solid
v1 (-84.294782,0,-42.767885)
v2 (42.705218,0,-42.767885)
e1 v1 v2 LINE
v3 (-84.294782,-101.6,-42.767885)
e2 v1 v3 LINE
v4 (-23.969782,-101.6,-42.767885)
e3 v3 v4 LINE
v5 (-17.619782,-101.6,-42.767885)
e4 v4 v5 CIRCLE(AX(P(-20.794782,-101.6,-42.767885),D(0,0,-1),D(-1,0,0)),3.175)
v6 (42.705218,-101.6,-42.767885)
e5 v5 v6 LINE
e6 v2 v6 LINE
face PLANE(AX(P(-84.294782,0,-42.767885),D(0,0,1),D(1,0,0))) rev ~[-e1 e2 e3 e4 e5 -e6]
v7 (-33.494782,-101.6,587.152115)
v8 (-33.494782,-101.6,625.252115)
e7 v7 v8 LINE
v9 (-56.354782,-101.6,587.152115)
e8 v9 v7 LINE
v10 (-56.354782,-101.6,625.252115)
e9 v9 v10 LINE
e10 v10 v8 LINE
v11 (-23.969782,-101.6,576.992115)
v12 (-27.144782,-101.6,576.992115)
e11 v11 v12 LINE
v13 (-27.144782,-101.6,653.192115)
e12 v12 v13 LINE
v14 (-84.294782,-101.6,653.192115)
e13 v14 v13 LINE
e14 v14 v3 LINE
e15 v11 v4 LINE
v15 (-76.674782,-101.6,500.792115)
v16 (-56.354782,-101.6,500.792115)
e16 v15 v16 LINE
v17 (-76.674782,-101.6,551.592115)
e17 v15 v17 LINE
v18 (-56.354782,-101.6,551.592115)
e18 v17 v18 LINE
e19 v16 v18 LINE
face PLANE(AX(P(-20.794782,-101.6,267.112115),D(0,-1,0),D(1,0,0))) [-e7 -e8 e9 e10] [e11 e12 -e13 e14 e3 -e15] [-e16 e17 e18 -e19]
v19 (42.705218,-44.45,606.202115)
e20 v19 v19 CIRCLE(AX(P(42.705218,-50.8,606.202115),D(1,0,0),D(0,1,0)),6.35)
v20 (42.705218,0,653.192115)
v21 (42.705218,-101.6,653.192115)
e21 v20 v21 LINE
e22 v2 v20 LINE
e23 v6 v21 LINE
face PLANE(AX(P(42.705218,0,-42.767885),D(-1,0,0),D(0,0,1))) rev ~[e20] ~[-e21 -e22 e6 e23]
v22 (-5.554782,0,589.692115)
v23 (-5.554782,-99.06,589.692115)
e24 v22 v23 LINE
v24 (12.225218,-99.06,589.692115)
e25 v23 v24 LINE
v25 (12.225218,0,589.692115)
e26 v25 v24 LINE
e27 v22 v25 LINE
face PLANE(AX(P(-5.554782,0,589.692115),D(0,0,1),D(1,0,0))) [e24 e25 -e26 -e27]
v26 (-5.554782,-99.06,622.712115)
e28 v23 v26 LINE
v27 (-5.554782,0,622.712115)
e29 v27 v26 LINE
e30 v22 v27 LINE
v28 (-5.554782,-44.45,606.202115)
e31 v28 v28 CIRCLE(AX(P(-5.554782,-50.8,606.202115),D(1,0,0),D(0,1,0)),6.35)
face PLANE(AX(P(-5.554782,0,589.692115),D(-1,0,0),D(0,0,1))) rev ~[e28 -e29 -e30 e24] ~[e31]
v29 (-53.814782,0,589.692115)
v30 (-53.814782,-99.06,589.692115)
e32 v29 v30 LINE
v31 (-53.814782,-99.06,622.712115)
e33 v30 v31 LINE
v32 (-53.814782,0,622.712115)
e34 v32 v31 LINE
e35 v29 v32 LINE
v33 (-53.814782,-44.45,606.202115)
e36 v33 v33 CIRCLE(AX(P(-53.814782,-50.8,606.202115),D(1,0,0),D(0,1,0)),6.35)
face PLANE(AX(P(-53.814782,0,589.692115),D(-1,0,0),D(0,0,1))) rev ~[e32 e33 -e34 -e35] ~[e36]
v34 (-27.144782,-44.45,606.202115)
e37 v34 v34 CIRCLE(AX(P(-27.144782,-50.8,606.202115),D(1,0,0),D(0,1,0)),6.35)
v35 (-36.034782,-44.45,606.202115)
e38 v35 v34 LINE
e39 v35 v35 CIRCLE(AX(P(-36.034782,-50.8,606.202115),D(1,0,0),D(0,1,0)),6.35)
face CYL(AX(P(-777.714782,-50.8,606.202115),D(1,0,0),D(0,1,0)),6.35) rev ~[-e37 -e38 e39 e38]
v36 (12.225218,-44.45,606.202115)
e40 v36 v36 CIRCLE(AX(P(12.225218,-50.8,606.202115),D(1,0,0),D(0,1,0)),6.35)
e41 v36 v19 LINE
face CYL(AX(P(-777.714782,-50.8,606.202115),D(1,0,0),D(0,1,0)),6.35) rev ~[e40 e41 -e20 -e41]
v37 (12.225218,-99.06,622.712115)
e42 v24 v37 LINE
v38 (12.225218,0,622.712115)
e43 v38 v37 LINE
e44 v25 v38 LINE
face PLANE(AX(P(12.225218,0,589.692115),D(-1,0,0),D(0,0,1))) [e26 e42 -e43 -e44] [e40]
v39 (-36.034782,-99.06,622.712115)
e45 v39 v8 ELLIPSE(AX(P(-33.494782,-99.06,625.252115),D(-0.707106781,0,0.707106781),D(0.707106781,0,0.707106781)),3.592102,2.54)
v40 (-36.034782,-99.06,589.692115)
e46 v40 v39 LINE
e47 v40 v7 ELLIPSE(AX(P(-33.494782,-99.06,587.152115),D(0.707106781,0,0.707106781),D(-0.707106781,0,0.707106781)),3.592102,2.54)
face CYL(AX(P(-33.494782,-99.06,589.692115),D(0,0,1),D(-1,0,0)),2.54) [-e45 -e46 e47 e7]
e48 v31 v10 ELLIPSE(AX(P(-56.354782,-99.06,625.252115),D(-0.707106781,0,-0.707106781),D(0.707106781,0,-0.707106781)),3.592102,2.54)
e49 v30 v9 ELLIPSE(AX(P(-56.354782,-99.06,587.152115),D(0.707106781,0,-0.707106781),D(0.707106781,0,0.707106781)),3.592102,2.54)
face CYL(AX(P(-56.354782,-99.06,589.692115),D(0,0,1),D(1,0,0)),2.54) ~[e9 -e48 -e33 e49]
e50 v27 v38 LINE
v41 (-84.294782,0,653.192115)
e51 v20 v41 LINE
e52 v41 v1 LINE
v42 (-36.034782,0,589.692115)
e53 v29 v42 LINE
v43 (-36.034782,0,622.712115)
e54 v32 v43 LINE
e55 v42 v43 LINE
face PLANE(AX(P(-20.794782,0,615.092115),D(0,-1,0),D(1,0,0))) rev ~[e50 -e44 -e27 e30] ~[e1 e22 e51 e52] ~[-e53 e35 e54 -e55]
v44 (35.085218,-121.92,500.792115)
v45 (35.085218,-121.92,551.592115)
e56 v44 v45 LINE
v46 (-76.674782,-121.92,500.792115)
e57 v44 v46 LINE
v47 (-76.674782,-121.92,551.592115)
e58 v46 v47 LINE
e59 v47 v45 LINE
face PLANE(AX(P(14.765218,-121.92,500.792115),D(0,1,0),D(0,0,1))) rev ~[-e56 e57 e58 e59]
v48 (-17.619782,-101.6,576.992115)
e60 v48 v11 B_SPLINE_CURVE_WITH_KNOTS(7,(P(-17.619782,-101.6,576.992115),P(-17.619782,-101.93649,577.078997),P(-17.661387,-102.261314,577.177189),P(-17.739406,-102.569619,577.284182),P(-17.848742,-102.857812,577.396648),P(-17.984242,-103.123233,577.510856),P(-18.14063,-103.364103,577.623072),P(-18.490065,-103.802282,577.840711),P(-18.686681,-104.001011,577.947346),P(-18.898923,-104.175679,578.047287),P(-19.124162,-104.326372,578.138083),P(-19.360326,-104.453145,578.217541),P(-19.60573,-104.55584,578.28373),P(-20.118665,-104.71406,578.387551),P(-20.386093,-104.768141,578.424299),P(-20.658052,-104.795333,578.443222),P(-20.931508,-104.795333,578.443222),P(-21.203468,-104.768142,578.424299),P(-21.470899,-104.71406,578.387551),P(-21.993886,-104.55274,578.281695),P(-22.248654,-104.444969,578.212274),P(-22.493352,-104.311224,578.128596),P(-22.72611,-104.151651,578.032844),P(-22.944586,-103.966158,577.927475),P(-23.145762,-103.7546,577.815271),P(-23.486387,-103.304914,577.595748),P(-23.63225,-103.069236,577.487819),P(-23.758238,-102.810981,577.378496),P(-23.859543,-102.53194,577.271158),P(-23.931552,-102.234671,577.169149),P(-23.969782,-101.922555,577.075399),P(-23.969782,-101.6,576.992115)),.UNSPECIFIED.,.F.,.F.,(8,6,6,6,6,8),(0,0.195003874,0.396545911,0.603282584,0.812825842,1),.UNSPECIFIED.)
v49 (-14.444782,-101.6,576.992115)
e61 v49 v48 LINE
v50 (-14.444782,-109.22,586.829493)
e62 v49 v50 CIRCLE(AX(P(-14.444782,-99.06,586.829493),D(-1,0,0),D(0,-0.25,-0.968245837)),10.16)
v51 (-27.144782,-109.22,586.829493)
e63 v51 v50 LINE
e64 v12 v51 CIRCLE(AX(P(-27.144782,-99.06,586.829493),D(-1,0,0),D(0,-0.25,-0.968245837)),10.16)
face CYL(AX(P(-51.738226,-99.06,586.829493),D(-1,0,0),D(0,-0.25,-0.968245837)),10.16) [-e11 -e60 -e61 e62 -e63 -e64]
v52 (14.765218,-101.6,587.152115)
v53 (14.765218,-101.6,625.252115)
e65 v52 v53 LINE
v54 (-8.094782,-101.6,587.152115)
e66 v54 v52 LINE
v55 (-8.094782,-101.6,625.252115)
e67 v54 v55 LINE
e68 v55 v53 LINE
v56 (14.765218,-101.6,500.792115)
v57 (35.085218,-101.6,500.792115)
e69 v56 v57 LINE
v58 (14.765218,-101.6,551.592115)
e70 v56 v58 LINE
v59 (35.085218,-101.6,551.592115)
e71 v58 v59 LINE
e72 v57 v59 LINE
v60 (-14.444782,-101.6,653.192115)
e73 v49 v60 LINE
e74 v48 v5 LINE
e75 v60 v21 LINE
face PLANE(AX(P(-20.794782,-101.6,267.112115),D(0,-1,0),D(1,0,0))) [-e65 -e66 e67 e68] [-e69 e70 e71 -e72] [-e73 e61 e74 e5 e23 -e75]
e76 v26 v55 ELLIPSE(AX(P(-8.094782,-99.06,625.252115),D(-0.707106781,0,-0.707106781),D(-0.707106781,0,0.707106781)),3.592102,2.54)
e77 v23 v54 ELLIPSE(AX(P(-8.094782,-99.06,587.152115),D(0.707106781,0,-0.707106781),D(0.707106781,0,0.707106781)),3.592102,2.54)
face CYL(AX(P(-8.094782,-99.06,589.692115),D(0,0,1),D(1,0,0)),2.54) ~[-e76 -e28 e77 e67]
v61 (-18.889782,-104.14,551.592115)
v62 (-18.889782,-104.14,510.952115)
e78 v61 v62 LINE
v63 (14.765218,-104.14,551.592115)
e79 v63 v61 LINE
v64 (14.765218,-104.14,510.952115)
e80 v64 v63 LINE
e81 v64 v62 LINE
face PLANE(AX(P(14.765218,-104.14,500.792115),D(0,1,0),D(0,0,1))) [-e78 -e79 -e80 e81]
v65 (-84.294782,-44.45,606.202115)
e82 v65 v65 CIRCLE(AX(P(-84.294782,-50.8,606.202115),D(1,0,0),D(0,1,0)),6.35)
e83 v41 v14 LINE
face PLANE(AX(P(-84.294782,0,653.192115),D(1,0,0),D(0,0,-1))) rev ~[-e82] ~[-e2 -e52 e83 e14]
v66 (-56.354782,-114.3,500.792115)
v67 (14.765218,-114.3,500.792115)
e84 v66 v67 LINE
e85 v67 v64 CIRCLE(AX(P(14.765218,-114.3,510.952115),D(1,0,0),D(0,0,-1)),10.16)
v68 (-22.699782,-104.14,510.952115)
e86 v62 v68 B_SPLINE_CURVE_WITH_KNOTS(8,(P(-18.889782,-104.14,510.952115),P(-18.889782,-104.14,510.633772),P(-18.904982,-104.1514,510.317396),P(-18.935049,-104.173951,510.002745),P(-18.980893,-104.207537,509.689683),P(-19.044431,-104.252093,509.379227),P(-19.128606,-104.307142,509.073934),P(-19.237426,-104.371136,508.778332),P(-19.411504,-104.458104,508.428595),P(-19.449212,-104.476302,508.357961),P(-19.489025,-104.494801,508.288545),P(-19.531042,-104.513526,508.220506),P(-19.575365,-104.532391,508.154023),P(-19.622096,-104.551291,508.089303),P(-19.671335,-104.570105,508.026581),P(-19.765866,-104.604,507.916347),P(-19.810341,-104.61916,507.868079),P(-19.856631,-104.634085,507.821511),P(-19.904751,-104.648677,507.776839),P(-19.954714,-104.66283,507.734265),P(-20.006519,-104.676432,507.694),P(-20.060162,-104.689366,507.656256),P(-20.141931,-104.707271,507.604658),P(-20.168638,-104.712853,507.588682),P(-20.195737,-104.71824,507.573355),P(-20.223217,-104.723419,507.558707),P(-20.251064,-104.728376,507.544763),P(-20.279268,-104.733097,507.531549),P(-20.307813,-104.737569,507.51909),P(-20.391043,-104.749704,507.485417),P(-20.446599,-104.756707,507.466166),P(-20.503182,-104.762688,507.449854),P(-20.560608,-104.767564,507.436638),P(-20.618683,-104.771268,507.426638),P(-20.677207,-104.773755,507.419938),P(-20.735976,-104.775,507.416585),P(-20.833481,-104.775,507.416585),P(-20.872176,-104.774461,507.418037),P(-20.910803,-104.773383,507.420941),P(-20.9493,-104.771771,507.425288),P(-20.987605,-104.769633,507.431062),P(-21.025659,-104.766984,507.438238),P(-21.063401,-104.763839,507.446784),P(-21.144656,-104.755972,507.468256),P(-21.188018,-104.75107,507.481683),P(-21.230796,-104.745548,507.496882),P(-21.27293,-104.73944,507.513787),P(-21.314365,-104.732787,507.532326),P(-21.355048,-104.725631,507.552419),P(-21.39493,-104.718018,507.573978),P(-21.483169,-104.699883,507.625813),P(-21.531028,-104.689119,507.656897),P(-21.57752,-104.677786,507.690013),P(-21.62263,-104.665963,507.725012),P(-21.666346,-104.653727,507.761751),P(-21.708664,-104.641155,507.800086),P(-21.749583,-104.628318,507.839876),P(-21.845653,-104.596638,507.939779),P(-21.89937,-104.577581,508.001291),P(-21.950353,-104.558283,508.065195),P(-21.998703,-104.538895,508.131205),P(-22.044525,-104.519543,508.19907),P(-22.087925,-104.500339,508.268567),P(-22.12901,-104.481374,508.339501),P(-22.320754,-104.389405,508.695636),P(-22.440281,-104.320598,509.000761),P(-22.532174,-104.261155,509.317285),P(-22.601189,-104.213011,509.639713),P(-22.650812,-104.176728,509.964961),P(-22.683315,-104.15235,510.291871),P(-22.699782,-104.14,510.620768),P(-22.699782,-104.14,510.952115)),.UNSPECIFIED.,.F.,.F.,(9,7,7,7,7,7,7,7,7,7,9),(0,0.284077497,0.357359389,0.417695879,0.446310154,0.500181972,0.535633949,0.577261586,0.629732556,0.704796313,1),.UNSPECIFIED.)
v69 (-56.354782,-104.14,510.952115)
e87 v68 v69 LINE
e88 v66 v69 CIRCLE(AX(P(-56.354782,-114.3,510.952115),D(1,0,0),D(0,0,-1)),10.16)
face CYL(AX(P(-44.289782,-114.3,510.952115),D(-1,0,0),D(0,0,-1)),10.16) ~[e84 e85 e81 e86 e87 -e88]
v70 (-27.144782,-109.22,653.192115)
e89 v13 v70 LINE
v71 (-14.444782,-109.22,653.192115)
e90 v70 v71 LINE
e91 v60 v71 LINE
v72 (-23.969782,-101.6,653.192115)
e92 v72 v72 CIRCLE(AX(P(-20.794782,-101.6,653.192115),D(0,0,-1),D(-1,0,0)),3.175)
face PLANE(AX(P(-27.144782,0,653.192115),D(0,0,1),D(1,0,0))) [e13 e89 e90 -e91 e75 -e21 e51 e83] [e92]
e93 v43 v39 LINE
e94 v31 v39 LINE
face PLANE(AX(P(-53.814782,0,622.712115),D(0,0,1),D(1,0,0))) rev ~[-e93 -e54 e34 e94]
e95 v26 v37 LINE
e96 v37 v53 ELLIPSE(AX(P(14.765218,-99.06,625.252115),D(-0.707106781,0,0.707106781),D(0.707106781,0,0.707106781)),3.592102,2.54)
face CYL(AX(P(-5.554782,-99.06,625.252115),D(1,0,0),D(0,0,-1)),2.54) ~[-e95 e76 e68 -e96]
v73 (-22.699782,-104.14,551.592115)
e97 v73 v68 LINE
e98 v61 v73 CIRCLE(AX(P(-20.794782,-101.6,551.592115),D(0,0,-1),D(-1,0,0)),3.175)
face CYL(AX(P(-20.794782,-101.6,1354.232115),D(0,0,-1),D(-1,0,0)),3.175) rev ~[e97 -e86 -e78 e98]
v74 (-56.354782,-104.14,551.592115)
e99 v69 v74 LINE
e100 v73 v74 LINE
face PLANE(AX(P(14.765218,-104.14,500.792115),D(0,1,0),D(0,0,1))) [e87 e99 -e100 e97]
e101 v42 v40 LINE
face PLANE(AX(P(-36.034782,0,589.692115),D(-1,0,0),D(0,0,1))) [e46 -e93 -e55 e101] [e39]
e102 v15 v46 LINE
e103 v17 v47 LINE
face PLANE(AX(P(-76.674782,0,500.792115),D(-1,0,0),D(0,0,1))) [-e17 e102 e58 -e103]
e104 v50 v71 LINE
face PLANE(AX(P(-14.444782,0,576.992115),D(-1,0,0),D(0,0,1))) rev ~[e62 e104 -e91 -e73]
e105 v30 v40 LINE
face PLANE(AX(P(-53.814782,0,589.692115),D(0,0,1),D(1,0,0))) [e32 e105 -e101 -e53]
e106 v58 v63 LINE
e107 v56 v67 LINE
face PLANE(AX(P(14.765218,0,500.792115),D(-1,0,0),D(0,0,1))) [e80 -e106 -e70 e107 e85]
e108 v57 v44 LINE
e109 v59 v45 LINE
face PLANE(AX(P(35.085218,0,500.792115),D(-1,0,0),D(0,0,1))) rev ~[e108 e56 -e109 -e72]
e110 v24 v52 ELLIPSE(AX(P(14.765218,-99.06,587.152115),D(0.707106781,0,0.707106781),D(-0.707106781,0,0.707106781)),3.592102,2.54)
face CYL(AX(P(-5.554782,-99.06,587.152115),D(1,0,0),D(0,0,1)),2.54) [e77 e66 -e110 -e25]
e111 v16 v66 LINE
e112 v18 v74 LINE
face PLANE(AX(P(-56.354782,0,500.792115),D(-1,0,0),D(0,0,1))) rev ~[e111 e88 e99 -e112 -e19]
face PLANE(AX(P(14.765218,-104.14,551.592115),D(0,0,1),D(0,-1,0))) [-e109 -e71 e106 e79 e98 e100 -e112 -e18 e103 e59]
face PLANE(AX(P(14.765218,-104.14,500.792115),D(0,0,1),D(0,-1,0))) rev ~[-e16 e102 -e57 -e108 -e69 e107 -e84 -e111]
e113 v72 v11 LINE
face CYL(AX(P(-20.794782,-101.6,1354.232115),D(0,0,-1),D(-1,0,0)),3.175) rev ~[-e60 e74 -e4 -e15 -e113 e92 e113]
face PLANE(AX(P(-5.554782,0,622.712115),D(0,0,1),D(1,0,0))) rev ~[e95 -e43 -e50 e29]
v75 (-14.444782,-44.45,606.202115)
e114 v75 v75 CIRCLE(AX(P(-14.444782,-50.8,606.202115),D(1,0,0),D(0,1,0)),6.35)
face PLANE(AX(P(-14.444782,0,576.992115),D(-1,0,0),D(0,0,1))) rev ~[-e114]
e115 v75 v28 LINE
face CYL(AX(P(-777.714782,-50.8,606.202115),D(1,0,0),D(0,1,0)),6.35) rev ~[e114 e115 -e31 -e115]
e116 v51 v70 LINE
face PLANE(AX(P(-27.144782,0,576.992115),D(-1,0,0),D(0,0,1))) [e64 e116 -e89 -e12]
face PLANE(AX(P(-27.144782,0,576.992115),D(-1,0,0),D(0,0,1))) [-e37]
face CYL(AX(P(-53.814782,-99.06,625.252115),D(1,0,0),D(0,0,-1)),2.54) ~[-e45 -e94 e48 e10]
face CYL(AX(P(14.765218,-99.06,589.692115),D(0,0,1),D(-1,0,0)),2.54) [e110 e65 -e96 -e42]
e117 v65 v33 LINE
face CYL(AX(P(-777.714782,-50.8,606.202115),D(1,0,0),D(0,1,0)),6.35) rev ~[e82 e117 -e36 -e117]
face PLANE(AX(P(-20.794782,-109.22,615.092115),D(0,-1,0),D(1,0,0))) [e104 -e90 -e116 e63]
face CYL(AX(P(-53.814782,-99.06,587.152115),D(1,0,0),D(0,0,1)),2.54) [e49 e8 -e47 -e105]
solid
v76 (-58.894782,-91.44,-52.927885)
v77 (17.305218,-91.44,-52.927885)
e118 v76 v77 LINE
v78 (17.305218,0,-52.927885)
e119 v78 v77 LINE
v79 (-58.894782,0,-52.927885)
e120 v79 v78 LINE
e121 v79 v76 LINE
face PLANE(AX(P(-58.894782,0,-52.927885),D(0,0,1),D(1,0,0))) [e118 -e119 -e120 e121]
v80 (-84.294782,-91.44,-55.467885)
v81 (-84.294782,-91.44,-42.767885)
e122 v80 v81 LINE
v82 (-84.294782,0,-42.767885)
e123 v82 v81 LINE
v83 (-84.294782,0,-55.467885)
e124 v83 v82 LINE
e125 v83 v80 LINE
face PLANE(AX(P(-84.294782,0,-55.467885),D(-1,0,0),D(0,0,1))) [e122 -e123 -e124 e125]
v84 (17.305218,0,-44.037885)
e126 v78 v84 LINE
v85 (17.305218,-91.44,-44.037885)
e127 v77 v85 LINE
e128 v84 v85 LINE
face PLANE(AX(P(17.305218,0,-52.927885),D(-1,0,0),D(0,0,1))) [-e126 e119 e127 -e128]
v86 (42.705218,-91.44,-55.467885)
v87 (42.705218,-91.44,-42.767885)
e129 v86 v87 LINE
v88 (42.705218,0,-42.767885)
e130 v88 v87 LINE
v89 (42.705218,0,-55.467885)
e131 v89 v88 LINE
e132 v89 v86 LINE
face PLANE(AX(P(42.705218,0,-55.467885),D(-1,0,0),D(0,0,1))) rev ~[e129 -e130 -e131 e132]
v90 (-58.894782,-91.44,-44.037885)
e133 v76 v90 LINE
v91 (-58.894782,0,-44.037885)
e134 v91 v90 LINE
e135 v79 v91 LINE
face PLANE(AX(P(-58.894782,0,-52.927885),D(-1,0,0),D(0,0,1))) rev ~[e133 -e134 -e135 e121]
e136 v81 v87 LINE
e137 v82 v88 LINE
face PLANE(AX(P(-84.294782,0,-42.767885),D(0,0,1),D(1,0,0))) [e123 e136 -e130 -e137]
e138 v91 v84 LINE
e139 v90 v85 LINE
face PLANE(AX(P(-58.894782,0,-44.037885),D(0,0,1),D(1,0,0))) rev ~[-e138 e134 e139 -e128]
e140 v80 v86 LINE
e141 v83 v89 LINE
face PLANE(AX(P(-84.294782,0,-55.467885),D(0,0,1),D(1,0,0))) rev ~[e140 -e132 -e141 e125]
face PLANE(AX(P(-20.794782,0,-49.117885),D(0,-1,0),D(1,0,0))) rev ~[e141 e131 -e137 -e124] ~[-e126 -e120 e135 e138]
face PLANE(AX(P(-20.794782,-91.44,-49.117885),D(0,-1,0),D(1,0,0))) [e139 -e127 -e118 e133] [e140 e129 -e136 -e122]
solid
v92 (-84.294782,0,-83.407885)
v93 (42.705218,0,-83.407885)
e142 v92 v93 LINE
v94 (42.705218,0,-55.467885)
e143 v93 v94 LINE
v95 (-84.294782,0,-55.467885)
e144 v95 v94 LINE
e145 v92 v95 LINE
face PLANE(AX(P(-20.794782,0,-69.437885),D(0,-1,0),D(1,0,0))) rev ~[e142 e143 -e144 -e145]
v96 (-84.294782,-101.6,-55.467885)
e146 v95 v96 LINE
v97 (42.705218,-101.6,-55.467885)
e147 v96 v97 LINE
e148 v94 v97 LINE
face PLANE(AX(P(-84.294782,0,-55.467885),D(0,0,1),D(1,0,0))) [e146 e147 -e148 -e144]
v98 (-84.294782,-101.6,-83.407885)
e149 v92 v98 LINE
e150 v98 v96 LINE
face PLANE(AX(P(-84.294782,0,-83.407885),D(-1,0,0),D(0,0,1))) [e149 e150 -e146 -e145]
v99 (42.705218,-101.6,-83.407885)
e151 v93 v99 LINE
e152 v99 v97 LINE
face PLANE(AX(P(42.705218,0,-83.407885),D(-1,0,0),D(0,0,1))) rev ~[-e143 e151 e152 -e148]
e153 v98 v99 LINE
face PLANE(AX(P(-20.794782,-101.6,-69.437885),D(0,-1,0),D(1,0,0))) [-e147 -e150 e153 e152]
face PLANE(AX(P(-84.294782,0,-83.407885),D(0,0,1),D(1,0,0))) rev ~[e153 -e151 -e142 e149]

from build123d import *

# Parameters (mm, degrees)
F0_W         = 127
F0_H         = 27.94
F1_DEPTH     = 101.6
F0_W_2       = 20.32
F0_H_2       = 50.8
F0_W_3       = 57.15
F0_H_3       = 76.2
F0_W_4       = 17.78
F0_H_4       = 33.02
F3_R         = 2.54
F0_H_5       = 12.7
F0_W_5       = 76.2
F0_H_6       = 8.89
F4_DEPTH     = 91.44
F6_D         = 12.7
F6_DEPTH     = 693.42
F6_TIP       = 3.8154649308
F0_W_6       = 12.7
F7_DEPTH     = 109.22
F8_T1_DEPTH  = 61.8868884968
F9_DEPTH     = 121.92
F10_W        = 17.78
F10_H        = 50.8
F11_DEPTH    = 71.12
F12_D        = 6.35
F12_DEPTH    = 701.04
F12_TIP      = 1.9077324654
F13_T1_DEPTH = 59.055
F13_T3_DEPTH = 59.055


# Not quite as in the source:
# - a fillet or chamfer that OpenCascade refuses, or shapes differently, is made with other operations: its cross-section is extruded or revolved along the edge and cut away or added
# - a feature names something its author has since deleted; it is built from what else it names


with BuildPart() as f1:
    # F0 (on Front) → F1 (new body)
    with BuildSketch(Plane.XZ):
        with Locations((-20.794781892, -69.4378848389)):
            Rectangle(F0_W, F0_H)
    extrude(amount=F1_DEPTH)


with BuildPart() as f1b:
    # F0 (on Front) → F1, piece 2 (new body)
    with BuildSketch(Plane.XZ):
        Polygon((-27.144781892, 576.9921151611), (-84.294781892, 576.9921151611), (-84.294781892, -42.7678848389), (42.705218108, -42.7678848389), (42.705218108, 576.9921151611), (-14.444781892, 576.9921151611), align=None)
        with Locations((-66.514781892, 526.1921151611)):
            Rectangle(F0_W_2, F0_H_2, mode=Mode.SUBTRACT)
        with Locations((24.925218108, 526.1921151611)):
            Rectangle(F0_W_2, F0_H_2, mode=Mode.SUBTRACT)
        with Locations((14.130218108, 615.0921151611)):
            Rectangle(F0_W_3, F0_H_3)
        with Locations((3.335218108, 606.2021151611)):
            Rectangle(F0_W_4, F0_H_4, mode=Mode.SUBTRACT)
        with Locations((-55.719781892, 615.0921151611)):
            Rectangle(F0_W_3, F0_H_3)
        with Locations((-44.924781892, 606.2021151611)):
            Rectangle(F0_W_4, F0_H_4, mode=Mode.SUBTRACT)
    extrude(amount=F1_DEPTH)

    # F3
    f3_edges = [f1b.edges().sort_by_distance(p)[0] for p in [
        (12.225218, -101.6, 606.202115),
        (3.335218, -101.6, 589.692115),
        (-5.554782, -101.6, 606.202115),
        (3.335218, -101.6, 622.712115),
        (-36.034782, -101.6, 606.202115),
        (-44.924782, -101.6, 622.712115),
        (-53.814782, -101.6, 606.202115),
        (-44.924782, -101.6, 589.692115),
    ]]
    fillet(f3_edges, radius=F3_R)

    # F6
    with Locations(Plane(origin=(-84.294781892, 0, 0), x_dir=(0, -1, 0), z_dir=(-1, 0, 0))):
        with Locations((50.8, 606.2021151611)):
            Hole(F6_D / 2, depth=F6_DEPTH)
            with Locations((0, 0, -(F6_DEPTH + F6_TIP / 2))):  # 118° drill point
                Cone(0, F6_D / 2, F6_TIP, mode=Mode.SUBTRACT)

    # F0 (on Front) → F7 (join)
    with BuildSketch(Plane.XZ):
        with Locations((-20.794781892, 615.0921151611)):
            Rectangle(F0_W_6, F0_H_3)
    extrude(amount=F7_DEPTH)

    # F8: fillet of radius 10.16 on 1 edges, made by hand

    # F8_s2 → F8_t1 (cut)
    with BuildSketch(Plane.YZ.offset(-51.7382261404)):
        with BuildLine():
            ThreePointArc((-101.6, 576.9921151611), (-107.0921852568, 580.6077889138), (-109.22, 586.8294928604))
            Line((-109.22, 586.8294928604), (-109.22, 576.9921151611))
            Line((-109.22, 576.9921151611), (-101.6, 576.9921151611))
        make_face()
    extrude(amount=F8_T1_DEPTH, mode=Mode.SUBTRACT)

    # F0 (on Front) → F9 (join)
    with BuildSketch(Plane.XZ):
        with Locations((24.925218108, 526.1921151611)):
            Rectangle(F0_W_2, F0_H_2)
        with Locations((-66.514781892, 526.1921151611)):
            Rectangle(F0_W_2, F0_H_2)
    extrude(amount=F9_DEPTH)

    # F10 (on face) → F11 (join)
    with BuildSketch(Plane(origin=(14.765218108, 0, 0), x_dir=(0, -1, 0), z_dir=(-1, 0, 0))):
        with Locations((113.03, 526.1921151611)):
            Rectangle(F10_W, F10_H)
    extrude(amount=F11_DEPTH)

    # F12
    with Locations(Plane.XY.offset(653.1921151611)):
        with Locations((-20.794781892, -101.6)):
            Hole(F12_D / 2, depth=F12_DEPTH)
            with Locations((0, 0, -(F12_DEPTH + F12_TIP / 2))):  # 118° drill point
                Cone(0, F12_D / 2, F12_TIP, mode=Mode.SUBTRACT)

    # F13: fillet of radius 10.16 on 2 edges, made by hand

    # F13_s2 → F13_t1 (cut)
    with BuildSketch(Plane.YZ.offset(-56.354781892)):
        with BuildLine():
            ThreePointArc((-114.3, 500.7921151611), (-107.1157951031, 503.7679102642), (-104.14, 510.9521151611))
            Line((-104.14, 510.9521151611), (-104.14, 500.7921151611))
            Line((-104.14, 500.7921151611), (-114.3, 500.7921151611))
        make_face()
    extrude(amount=F13_T1_DEPTH, mode=Mode.SUBTRACT)

    # F13_s4 → F13_t3 (cut)
    with BuildSketch(Plane.YZ.offset(-44.289781892)):
        with BuildLine():
            ThreePointArc((-114.3, 500.7921151611), (-107.1157951031, 503.7679102642), (-104.14, 510.9521151611))
            Line((-104.14, 510.9521151611), (-104.14, 500.7921151611))
            Line((-104.14, 500.7921151611), (-114.3, 500.7921151611))
        make_face()
    extrude(amount=F13_T3_DEPTH, mode=Mode.SUBTRACT)


with BuildPart() as f4:
    # F0 (on Front) → F4 (new body)
    with BuildSketch(Plane.XZ):
        with Locations((-20.794781892, -49.1178848389)):
            Rectangle(F0_W, F0_H_5)
        with Locations((-20.794781892, -48.4828848389)):
            Rectangle(F0_W_5, F0_H_6, mode=Mode.SUBTRACT)
    extrude(amount=F4_DEPTH)


solid = Compound([f1.part, f1b.part, f4.part])
